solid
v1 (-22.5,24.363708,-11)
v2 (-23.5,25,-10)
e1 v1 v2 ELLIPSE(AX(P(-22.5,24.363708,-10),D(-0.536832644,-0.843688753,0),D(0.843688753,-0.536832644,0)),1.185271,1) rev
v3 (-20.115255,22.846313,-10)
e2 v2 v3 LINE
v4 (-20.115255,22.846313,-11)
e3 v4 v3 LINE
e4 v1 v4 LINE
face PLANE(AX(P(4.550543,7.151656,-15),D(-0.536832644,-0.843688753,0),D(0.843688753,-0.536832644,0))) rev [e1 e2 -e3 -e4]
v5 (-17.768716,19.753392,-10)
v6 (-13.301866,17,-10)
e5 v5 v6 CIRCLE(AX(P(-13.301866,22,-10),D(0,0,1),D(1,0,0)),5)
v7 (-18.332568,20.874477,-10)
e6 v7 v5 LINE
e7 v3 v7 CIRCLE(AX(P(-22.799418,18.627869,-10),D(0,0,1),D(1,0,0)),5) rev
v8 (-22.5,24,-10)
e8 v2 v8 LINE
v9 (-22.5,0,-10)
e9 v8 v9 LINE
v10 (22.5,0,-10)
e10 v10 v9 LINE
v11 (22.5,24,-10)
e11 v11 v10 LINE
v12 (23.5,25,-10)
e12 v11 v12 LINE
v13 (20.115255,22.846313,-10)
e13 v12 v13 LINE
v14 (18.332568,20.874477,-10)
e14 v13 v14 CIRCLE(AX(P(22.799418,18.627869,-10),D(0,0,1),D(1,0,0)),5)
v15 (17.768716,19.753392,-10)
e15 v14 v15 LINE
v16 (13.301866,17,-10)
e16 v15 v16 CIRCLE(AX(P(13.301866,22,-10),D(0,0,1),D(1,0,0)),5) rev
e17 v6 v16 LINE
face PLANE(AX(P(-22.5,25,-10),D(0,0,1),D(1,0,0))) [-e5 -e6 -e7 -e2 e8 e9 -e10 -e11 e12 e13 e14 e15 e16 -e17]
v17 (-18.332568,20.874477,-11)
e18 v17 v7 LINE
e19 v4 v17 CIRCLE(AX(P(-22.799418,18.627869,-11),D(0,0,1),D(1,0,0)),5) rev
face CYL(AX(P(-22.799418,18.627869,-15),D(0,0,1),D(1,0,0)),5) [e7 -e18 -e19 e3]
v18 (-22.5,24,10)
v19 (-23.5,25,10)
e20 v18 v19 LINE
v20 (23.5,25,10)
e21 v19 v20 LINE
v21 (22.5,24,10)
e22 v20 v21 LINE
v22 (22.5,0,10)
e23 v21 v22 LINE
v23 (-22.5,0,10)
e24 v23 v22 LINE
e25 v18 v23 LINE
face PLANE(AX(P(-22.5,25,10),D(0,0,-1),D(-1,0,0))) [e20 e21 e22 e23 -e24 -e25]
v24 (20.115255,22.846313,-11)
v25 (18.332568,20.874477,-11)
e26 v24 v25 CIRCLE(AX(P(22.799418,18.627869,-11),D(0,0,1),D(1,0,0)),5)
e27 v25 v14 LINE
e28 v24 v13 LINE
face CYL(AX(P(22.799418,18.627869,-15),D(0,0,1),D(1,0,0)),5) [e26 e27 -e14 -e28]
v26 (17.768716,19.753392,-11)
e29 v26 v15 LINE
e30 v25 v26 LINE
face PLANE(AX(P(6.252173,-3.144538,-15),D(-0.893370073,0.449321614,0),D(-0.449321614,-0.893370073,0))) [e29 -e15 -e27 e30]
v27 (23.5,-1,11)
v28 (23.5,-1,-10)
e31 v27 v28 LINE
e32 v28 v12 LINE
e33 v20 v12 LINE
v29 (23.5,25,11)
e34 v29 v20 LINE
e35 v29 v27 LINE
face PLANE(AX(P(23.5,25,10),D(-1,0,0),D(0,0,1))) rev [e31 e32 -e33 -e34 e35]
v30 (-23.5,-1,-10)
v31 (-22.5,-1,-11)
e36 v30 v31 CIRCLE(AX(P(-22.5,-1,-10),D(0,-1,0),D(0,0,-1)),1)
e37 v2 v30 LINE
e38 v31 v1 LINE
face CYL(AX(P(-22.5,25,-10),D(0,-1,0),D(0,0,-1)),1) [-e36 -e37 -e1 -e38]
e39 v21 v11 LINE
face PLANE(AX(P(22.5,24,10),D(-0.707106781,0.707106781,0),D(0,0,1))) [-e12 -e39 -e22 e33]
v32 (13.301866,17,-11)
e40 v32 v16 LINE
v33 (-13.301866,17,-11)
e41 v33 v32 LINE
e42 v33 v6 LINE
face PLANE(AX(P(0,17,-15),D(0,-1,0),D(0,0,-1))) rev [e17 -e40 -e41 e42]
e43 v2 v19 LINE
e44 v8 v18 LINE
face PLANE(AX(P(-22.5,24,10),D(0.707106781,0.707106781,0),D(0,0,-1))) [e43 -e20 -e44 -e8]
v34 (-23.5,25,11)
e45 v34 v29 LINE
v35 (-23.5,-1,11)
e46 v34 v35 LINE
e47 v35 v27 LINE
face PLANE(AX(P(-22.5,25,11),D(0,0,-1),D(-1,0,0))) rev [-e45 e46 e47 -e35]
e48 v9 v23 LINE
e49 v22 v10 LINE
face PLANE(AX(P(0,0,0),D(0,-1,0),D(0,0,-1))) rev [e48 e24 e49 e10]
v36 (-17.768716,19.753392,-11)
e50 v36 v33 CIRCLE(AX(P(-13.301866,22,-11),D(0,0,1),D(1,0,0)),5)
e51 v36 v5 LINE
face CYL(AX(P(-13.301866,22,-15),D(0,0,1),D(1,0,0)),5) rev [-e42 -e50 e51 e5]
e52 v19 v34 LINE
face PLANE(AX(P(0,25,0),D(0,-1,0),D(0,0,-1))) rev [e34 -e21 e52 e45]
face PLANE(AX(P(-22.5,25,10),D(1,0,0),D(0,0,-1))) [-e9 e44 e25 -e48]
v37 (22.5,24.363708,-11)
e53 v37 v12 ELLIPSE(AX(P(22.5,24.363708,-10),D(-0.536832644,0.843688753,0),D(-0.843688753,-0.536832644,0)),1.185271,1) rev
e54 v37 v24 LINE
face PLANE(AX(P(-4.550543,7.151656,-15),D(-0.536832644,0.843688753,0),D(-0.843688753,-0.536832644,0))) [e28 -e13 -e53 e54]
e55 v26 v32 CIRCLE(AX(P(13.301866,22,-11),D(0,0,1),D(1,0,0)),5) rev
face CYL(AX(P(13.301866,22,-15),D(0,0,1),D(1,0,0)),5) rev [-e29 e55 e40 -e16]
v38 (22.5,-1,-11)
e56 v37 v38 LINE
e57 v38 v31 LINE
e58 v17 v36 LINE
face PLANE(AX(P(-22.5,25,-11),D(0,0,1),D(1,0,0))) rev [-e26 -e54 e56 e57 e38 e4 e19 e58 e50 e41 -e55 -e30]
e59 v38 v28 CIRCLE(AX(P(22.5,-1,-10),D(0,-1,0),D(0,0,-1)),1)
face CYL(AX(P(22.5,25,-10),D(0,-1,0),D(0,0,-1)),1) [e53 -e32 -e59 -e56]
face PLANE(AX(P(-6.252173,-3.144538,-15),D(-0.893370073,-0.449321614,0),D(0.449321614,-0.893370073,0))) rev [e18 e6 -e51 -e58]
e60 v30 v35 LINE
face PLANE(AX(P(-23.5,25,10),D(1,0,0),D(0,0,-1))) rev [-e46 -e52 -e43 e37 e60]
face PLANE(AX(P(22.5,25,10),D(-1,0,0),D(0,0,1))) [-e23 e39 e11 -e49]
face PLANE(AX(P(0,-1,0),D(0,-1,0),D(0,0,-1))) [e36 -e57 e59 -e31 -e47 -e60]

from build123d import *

# Parameters (mm, degrees)
CROQUIS1_W              = 45
CROQUIS1_H              = 20
SALIENTE_EXTRUIR1_DEPTH = 25
VACIADO5_T              = 1
REDONDEO1_R             = 1
CORTAR_EXTRUIR1_START   = -10
CORTAR_EXTRUIR1_DEPTH   = 5
CHAFL_N2_SIZE           = 1


with BuildPart() as part:
    # Croquis1 → Saliente-Extruir1 (new body)
    with BuildSketch(Plane(origin=(0, 0, 0), x_dir=(1, 0, 0), z_dir=(0, 1, 0))):
        Rectangle(CROQUIS1_W, CROQUIS1_H)
    extrude(amount=SALIENTE_EXTRUIR1_DEPTH)

    # Vaciado5
    vaciado5_openings = [part.faces().sort_by_distance(p)[0] for p in [
        (0, 25, 0),
    ]]
    offset(amount=VACIADO5_T, openings=vaciado5_openings, kind=Kind.INTERSECTION)

    # Redondeo1
    # the kernel refuses this fillet: 1 mm, written as the material it takes off along each edge
    with BuildSketch(Plane(origin=(-23.5, -3.5, -11), x_dir=(1, 0, 0), z_dir=(0, 1, 0)), Plane(origin=(23.5, -3.5, -11), x_dir=(0, 0, 1), z_dir=(0, 1, 0))) as redondeo1_piece_1:
        with BuildLine():
            CenterArc((REDONDEO1_R, -REDONDEO1_R), REDONDEO1_R, 90, 90)
            Line((0, -REDONDEO1_R), (0, 0))
            Line((0, 0), (REDONDEO1_R, 0))
        make_face()
    extrude(amount=31, mode=Mode.SUBTRACT)

    # Croquis2 → Cortar-Extruir1 (cut)
    with BuildSketch(Plane.XY.offset(CORTAR_EXTRUIR1_START)):
        with BuildLine():
            ThreePointArc((17.768716436, 19.753391932), (15.925504733, 17.743649431), (13.30186607, 17))
            Line((13.30186607, 17), (-13.30186607, 17))
            ThreePointArc((-13.30186607, 17), (-15.925504733, 17.743649431), (-17.768716436, 19.753391932))
            Line((-17.768716436, 19.753391932), (-18.332567601, 20.87447701))
            ThreePointArc((-18.332567601, 20.87447701), (-19.090471642, 21.981034188), (-20.115254744, 22.846312707))
            Line((-20.115254744, 22.846312707), (-23.5, 25))
            Line((-23.5, 25), (23.5, 25))
            Line((23.5, 25), (20.115254744, 22.846312707))
            ThreePointArc((20.115254744, 22.846312707), (19.090471642, 21.981034188), (18.332567601, 20.87447701))
            Line((18.332567601, 20.87447701), (17.768716436, 19.753391932))
        make_face()
    extrude(amount=-CORTAR_EXTRUIR1_DEPTH, mode=Mode.SUBTRACT)

    # Chaflán1
    # the kernel refuses this chamfer: 1 mm, written as the material it takes off along each edge
    with BuildSketch(Plane(origin=(-22.5, 25, -10), x_dir=(0.027495876610585647, -0.9996219169112968, 0), z_dir=(0, 0, 1))) as chafl_n1_piece_1:
        with BuildLine():
            Line((1.028673195, 0), (-0.056547155, -1.027117794))
            Line((-0.056547155, -1.027117794), (-0.076539593, -1.026567876))
            ThreePointArc((-0.076539593, -1.026567876), (-0.034129227, -0.51339783), (-0.019992438, 0.000549918))
            Line((-0.019992438, 0.000549918), (0.000549918, 0.019992438))
            ThreePointArc((0.000549918, 0.019992438), (0.514497665, 0.00585565), (1.029223113, 0.019992438))
            Line((1.029223113, 0.019992438), (1.028673195, 0))
        make_face()
    extrude(amount=20, mode=Mode.SUBTRACT)

    # Chaflán2
    # the kernel refuses this chamfer: 1 mm, written as the material it takes off along each edge
    with BuildSketch(Plane(origin=(22.5, 25, 10), x_dir=(-0.027495876610585647, -0.9996219169112968, 0), z_dir=(0, 0, -1))) as chafl_n2_piece_1:
        Polygon((CHAFL_N2_SIZE * 0.999621916911, -CHAFL_N2_SIZE * 0.0274958766106), (-CHAFL_N2_SIZE * 0.0274958766106, -CHAFL_N2_SIZE * 0.999621916911), (0, 0), align=None)
    extrude(amount=20, mode=Mode.SUBTRACT)


solid = part.part
